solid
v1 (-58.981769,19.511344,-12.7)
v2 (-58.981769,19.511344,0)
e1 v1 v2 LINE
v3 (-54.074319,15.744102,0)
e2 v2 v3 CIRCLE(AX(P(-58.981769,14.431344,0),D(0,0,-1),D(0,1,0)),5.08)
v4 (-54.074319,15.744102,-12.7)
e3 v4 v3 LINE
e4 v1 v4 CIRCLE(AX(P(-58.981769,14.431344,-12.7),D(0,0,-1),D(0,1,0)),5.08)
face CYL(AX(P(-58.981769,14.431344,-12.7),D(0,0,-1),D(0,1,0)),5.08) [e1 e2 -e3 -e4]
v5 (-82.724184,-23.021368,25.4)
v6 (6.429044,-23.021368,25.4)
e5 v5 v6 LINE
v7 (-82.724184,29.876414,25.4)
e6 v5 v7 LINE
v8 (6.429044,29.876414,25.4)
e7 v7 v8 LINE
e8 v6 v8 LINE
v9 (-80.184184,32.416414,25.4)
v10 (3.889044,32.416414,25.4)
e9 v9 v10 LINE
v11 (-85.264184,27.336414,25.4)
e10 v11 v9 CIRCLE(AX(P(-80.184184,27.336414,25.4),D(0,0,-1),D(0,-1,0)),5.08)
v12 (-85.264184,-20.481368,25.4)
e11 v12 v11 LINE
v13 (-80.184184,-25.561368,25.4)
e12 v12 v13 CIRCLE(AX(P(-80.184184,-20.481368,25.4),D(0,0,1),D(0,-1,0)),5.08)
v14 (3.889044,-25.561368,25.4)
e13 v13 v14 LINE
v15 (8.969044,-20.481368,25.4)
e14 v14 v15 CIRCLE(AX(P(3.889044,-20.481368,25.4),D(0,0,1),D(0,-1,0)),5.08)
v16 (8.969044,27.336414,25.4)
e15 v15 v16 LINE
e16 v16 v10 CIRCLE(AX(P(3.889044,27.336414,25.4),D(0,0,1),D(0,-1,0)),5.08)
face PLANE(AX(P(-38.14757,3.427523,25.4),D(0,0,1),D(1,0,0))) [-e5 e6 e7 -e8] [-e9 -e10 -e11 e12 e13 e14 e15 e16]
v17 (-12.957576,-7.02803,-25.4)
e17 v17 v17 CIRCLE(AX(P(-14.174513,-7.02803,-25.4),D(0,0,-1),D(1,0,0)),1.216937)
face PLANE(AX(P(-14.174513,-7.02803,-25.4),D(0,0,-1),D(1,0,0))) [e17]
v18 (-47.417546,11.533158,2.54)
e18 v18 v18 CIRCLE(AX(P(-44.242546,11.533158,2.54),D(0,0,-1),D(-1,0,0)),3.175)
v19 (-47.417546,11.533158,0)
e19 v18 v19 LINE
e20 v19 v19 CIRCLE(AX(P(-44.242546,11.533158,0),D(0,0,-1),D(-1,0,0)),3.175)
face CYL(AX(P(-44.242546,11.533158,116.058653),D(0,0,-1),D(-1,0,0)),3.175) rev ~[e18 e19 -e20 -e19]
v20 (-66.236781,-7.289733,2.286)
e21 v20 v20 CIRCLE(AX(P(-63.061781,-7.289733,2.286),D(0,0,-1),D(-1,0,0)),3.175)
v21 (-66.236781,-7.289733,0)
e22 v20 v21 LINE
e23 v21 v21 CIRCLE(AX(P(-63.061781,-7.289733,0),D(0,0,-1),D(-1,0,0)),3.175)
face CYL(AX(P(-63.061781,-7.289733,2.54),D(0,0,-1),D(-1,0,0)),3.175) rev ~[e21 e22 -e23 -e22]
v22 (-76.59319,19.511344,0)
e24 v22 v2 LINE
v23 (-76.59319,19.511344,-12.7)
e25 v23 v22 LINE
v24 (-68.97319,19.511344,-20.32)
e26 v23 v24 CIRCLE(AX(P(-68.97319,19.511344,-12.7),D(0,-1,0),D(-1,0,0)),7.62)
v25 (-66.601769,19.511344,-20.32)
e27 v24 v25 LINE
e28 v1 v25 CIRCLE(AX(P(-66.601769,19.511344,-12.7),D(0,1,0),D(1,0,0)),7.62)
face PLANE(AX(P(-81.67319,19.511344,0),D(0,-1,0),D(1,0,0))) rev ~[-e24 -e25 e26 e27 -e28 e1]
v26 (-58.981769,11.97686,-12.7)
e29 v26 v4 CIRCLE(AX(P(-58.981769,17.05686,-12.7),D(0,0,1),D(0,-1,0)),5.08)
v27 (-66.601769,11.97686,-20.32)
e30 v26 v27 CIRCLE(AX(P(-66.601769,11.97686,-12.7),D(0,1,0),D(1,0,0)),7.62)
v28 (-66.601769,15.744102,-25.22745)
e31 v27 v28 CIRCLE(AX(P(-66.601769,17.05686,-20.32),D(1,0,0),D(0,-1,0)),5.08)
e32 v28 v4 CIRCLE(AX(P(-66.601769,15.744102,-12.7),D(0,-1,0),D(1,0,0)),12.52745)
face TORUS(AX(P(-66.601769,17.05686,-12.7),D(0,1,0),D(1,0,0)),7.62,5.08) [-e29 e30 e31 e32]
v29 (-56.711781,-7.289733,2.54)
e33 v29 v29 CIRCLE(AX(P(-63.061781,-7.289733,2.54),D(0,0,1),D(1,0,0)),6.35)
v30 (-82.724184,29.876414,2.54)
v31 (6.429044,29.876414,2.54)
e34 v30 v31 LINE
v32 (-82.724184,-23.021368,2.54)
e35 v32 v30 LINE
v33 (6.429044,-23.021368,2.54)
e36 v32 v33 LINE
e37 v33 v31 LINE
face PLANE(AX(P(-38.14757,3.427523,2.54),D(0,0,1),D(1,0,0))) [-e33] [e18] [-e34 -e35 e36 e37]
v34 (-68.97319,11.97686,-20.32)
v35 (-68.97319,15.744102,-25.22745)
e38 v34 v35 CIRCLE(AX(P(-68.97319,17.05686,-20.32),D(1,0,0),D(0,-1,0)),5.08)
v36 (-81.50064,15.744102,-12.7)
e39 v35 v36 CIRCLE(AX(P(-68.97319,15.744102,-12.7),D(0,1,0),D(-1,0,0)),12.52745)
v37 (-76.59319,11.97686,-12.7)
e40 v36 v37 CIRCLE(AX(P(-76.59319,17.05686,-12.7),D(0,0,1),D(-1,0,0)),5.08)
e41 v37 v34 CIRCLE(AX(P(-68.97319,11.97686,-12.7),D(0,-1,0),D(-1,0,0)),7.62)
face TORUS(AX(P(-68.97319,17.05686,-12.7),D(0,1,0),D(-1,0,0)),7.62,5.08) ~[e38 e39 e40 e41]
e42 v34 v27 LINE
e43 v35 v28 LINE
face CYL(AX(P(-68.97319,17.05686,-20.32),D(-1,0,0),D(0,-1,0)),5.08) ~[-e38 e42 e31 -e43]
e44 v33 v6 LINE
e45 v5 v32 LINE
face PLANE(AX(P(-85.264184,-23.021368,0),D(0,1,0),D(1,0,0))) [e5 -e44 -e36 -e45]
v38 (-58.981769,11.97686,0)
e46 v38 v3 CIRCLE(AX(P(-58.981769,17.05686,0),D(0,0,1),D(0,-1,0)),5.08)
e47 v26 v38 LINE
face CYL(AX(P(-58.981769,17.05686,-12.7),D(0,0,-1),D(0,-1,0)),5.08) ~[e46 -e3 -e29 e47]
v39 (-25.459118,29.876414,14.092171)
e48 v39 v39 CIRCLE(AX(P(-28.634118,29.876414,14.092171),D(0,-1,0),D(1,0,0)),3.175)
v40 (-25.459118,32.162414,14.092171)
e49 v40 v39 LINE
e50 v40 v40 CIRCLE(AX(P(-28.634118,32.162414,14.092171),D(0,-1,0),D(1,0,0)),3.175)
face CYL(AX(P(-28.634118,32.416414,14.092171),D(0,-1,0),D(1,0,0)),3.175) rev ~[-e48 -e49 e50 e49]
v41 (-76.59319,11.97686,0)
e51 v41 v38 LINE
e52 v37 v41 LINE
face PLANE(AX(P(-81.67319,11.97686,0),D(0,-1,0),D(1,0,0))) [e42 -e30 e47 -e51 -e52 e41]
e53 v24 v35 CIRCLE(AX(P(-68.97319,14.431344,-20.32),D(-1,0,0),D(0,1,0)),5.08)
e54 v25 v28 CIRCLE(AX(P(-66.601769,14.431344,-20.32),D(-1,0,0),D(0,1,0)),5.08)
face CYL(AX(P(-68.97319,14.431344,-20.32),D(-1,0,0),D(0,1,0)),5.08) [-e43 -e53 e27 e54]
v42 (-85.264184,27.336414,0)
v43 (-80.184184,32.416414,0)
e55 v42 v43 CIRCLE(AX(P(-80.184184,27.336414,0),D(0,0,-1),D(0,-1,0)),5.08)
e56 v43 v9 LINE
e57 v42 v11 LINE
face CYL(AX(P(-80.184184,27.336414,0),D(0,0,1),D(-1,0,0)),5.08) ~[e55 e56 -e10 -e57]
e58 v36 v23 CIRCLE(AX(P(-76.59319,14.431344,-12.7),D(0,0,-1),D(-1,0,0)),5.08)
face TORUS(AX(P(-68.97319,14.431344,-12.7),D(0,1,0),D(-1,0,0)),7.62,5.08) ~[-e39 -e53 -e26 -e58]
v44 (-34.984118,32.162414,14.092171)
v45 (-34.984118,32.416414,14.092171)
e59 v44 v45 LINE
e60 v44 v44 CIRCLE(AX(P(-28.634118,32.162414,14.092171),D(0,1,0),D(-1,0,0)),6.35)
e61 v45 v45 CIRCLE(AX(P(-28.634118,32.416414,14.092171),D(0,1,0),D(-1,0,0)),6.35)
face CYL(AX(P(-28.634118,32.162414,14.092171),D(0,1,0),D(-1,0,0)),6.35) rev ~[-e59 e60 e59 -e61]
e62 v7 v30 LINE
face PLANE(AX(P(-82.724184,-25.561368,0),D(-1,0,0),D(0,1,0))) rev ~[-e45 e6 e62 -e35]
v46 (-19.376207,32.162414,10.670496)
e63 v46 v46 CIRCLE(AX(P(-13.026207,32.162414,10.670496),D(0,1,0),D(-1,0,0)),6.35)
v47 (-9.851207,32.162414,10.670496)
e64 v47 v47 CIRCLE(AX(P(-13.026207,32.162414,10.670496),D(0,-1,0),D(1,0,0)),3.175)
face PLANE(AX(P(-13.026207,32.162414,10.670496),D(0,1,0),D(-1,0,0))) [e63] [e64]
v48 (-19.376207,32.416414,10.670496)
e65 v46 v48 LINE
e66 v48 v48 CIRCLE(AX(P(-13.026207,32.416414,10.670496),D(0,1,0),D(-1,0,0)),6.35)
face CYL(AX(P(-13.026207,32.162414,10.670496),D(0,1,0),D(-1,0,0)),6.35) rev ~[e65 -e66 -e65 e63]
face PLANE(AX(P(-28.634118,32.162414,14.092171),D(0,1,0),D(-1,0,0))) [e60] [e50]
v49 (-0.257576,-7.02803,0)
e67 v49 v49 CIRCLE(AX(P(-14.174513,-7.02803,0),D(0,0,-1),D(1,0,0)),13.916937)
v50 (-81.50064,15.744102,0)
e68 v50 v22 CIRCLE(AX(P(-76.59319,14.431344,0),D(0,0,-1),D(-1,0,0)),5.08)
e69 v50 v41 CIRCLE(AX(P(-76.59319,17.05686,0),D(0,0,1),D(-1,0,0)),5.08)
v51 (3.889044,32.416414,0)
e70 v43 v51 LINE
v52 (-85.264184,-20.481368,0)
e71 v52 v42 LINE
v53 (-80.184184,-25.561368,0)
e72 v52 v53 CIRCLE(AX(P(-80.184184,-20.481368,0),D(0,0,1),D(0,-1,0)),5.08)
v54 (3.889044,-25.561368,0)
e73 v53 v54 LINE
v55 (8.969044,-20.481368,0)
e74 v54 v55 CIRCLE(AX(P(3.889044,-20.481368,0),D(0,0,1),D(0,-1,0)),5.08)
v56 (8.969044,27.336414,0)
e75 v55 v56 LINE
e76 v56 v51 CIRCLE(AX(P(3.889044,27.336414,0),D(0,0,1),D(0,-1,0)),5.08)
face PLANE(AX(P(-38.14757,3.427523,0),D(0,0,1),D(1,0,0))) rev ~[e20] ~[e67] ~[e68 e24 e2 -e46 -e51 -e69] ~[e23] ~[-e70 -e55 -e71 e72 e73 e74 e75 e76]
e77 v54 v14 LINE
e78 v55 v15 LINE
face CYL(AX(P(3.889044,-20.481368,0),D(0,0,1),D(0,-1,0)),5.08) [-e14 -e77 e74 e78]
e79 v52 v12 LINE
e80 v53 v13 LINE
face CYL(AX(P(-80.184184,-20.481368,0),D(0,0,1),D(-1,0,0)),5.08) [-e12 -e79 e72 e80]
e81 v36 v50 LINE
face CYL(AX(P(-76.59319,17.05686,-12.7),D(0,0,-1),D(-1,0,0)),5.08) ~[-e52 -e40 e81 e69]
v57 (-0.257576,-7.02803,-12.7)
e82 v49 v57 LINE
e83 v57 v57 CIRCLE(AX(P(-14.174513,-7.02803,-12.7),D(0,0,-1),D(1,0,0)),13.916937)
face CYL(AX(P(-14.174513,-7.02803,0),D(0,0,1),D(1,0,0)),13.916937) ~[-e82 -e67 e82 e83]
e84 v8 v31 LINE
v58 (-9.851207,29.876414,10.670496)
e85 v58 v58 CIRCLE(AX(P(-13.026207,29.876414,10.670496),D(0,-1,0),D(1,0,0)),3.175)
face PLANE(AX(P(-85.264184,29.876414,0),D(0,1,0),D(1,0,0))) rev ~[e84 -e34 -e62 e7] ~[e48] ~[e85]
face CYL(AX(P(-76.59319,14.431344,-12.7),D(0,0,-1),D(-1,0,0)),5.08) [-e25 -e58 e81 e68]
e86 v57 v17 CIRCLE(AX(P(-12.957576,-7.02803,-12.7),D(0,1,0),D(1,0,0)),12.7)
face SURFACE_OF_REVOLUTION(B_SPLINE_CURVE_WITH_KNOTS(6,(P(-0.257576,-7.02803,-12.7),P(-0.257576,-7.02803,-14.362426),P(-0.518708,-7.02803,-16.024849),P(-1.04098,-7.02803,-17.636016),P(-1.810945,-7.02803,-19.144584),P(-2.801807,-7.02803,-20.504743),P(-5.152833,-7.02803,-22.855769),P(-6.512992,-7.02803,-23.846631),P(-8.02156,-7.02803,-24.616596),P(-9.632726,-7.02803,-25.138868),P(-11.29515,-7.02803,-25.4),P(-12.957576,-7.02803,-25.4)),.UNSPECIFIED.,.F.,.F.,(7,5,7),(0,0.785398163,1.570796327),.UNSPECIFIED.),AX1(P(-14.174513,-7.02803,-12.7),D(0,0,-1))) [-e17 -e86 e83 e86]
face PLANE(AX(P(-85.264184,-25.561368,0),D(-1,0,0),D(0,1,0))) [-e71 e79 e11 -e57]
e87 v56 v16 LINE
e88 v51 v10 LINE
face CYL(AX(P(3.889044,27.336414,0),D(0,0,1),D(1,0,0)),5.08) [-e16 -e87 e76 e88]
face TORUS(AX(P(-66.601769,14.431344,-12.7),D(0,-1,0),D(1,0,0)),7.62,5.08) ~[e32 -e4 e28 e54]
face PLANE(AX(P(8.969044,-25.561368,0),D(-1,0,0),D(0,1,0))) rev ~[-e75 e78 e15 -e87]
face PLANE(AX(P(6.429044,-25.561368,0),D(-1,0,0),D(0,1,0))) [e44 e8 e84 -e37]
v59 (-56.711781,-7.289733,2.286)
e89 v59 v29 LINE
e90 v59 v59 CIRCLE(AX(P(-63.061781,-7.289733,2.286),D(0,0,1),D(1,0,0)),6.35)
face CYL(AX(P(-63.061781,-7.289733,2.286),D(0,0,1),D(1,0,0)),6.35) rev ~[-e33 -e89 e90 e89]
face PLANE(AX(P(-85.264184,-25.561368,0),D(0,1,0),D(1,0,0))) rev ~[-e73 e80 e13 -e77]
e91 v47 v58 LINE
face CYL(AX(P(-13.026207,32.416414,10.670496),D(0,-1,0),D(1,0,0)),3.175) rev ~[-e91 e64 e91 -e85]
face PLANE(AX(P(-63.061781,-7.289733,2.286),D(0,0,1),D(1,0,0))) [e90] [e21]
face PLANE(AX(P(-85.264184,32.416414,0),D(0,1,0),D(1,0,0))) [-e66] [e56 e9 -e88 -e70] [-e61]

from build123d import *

# Parameters (mm, degrees)
F0_W           = 94.2332278937
F0_H           = 57.9777825624
F1_DEPTH       = 25.4
F2_T           = -2.54
F3_R           = 5.08
F5_D           = 6.35
F7_D           = 6.35
F7_DEPTH       = 12.7
F7_CBORE_D     = 12.7
F7_CBORE_DEPTH = 0.254
F7_TIP         = 1.9077324654
F9_D           = 6.35
F9_DEPTH       = 12.7
F9_CBORE_D     = 12.7
F9_CBORE_DEPTH = 0.254
F9_TIP         = 1.9077324654
F10_R          = 13.9169366501
F11_DEPTH      = 25.4
F12_R          = 12.7
F13_W          = 27.7714207768
F13_H          = 7.534484379
F14_DEPTH      = 25.4
F15_R          = 12.7
F16_T1_DEPTH   = 12.7
F16_T3_DEPTH   = 2.3714207768
F16_T6_ANGLE   = 90
F16_T8_ANGLE   = 90
F16_T10_ANGLE  = 90
F16_T12_ANGLE  = 90


# Not quite as in the source:
# - a fillet or chamfer that OpenCascade refuses, or shapes differently, is made with other operations: its cross-section is extruded or revolved along the edge and cut away or added


with BuildPart() as f1:
    # F0 (on Top) → F1 (new body)
    with BuildSketch(Plane.XY):
        with Locations((-38.147569634, 3.4275231883)):
            Rectangle(F0_W, F0_H)
    extrude(amount=F1_DEPTH)

    # F2
    f2_openings = [f1.faces().sort_by_distance(p)[0] for p in [
        (-38.14757, 3.427523, 25.4),
    ]]
    offset(amount=F2_T, openings=f2_openings)

    # F3
    f3_edges = [f1.edges().sort_by_distance(p)[0] for p in [
        (-85.264184, -25.561368, 12.7),
        (8.969044, -25.561368, 12.7),
        (8.969044, 32.416414, 12.7),
        (-85.264184, 32.416414, 12.7),
    ]]
    fillet(f3_edges, radius=F3_R)

    # F5 (through all)
    with Locations(Plane.XY.offset(2.54)):
        with Locations((-44.2425459623, 11.5331579)):
            Hole(F5_D / 2)

    # F7
    with Locations(Plane.XY.offset(2.54)):
        with Locations((-63.0617812276, -7.2897328064)):
            CounterBoreHole(F7_D / 2, F7_CBORE_D / 2, F7_CBORE_DEPTH, depth=F7_DEPTH)
            with Locations((0, 0, -(F7_DEPTH + F7_TIP / 2))):  # 118° drill point
                Cone(0, F7_D / 2, F7_TIP, mode=Mode.SUBTRACT)

    # F9
    with Locations(Plane(origin=(0, 32.4164144695, 0), x_dir=(-1, 0, 0), z_dir=(0, 1, 0))):
        with Locations((13.0262067541, 10.6704961509), (28.6341179162, 14.0921706334)):
            CounterBoreHole(F9_D / 2, F9_CBORE_D / 2, F9_CBORE_DEPTH, depth=F9_DEPTH)
            with Locations((0, 0, -(F9_DEPTH + F9_TIP / 2))):  # 118° drill point
                Cone(0, F9_D / 2, F9_TIP, mode=Mode.SUBTRACT)

    # F10 (on face) → F11 (join)
    with BuildSketch(Plane(origin=(0, 0, 0), x_dir=(1, 0, 0), z_dir=(0, 0, -1))):
        with Locations((-14.1745125875, 7.0280302316)):
            Circle(F10_R)
    extrude(amount=F11_DEPTH)

    # F12
    f12_edges = [f1.edges().sort_by_distance(p)[0] for p in [
        (-28.091449, -7.02803, -25.4),
    ]]
    fillet(f12_edges, radius=F12_R)

    # F13 (on face) → F14 (join)
    with BuildSketch(Plane(origin=(0, 0, 0), x_dir=(1, 0, 0), z_dir=(0, 0, -1))):
        with Locations((-67.7874796093, -15.7441017218)):
            Rectangle(F13_W, F13_H)
    extrude(amount=F14_DEPTH)

    # F15
    f15_edges = [f1.edges().sort_by_distance(p)[0] for p in [
        (-53.901769, 15.744102, -25.4),
        (-81.67319, 15.744102, -25.4),
    ]]
    fillet(f15_edges, radius=F15_R)

    # F16: fillet of radius 5.08 on 2 edges, made by hand

    # F16_s2 → F16_t1 (cut)
    with BuildSketch(Plane.XY.offset(-12.7)):
        with BuildLine():
            ThreePointArc((-58.9817692208, 19.5113439113), (-55.3896667724, 18.0234463597), (-53.9017692208, 14.4313439113))
            Line((-53.9017692208, 14.4313439113), (-53.9017692208, 19.5113439113))
            Line((-53.9017692208, 19.5113439113), (-58.9817692208, 19.5113439113))
        make_face()
        with BuildLine():
            ThreePointArc((-81.6731899977, 14.4313439113), (-80.1852924461, 18.0234463597), (-76.5931899977, 19.5113439113))
            Line((-76.5931899977, 19.5113439113), (-81.6731899977, 19.5113439113))
            Line((-81.6731899977, 19.5113439113), (-81.6731899977, 14.4313439113))
        make_face()
        with BuildLine():
            ThreePointArc((-81.6731899977, 17.0568595323), (-80.1852924461, 13.4647570839), (-76.5931899977, 11.9768595323))
            Line((-76.5931899977, 11.9768595323), (-81.6731899977, 11.9768595323))
            Line((-81.6731899977, 11.9768595323), (-81.6731899977, 17.0568595323))
        make_face()
        with BuildLine():
            ThreePointArc((-58.9817692208, 11.9768595323), (-55.3896667724, 13.4647570839), (-53.9017692208, 17.0568595323))
            Line((-53.9017692208, 17.0568595323), (-53.9017692208, 11.9768595323))
            Line((-53.9017692208, 11.9768595323), (-58.9817692208, 11.9768595323))
        make_face()
    extrude(amount=F16_T1_DEPTH, mode=Mode.SUBTRACT)

    # F16_s4 → F16_t3 (cut)
    with BuildSketch(Plane.YZ.offset(-68.9731899977)):
        with BuildLine():
            ThreePointArc((19.5113439113, -20.32), (18.0234463597, -23.9121024484), (14.4313439113, -25.4))
            Line((14.4313439113, -25.4), (19.5113439113, -25.4))
            Line((19.5113439113, -25.4), (19.5113439113, -20.32))
        make_face()
        with BuildLine():
            ThreePointArc((11.9768595323, -20.32), (13.4647570839, -23.9121024484), (17.0568595323, -25.4))
            Line((17.0568595323, -25.4), (11.9768595323, -25.4))
            Line((11.9768595323, -25.4), (11.9768595323, -20.32))
        make_face()
    extrude(amount=F16_T3_DEPTH, mode=Mode.SUBTRACT)

    # F16_s5 → F16_t6 (revolve, cut)
    with BuildSketch(Plane.XY.offset(-12.7)):
        with BuildLine():
            ThreePointArc((-76.5931899977, 11.9768595323), (-80.1852924461, 13.4647570839), (-81.6731899977, 17.0568595323))
            Line((-81.6731899977, 17.0568595323), (-81.6731899977, 11.9768595323))
            Line((-81.6731899977, 11.9768595323), (-76.5931899977, 11.9768595323))
        make_face()
    revolve(axis=Axis((-68.9731899977, 11.9768595323, -12.7), (0, -1, 0)), revolution_arc=F16_T6_ANGLE, mode=Mode.SUBTRACT)

    # F16_s7 → F16_t8 (revolve, cut)
    with BuildSketch(Plane.XY.offset(-12.7)):
        with BuildLine():
            ThreePointArc((-58.9817692208, 19.5113439113), (-55.3896667724, 18.0234463597), (-53.9017692208, 14.4313439113))
            Line((-53.9017692208, 14.4313439113), (-53.9017692208, 19.5113439113))
            Line((-53.9017692208, 19.5113439113), (-58.9817692208, 19.5113439113))
        make_face()
    revolve(axis=Axis((-66.6017692208, 19.5113439113, -12.7), (0, 1, 0)), revolution_arc=F16_T8_ANGLE, mode=Mode.SUBTRACT)

    # F16_s9 → F16_t10 (revolve, cut)
    with BuildSketch(Plane.XY.offset(-12.7)):
        with BuildLine():
            ThreePointArc((-81.6731899977, 14.4313439113), (-80.1852924461, 18.0234463597), (-76.5931899977, 19.5113439113))
            Line((-76.5931899977, 19.5113439113), (-81.6731899977, 19.5113439113))
            Line((-81.6731899977, 19.5113439113), (-81.6731899977, 14.4313439113))
        make_face()
    revolve(axis=Axis((-68.9731899977, 19.5113439113, -12.7), (0, -1, 0)), revolution_arc=F16_T10_ANGLE, mode=Mode.SUBTRACT)

    # F16_s11 → F16_t12 (revolve, cut)
    with BuildSketch(Plane.XY.offset(-12.7)):
        with BuildLine():
            ThreePointArc((-58.9817692208, 11.9768595323), (-55.3896667724, 13.4647570839), (-53.9017692208, 17.0568595323))
            Line((-53.9017692208, 17.0568595323), (-53.9017692208, 11.9768595323))
            Line((-53.9017692208, 11.9768595323), (-58.9817692208, 11.9768595323))
        make_face()
    revolve(axis=Axis((-66.6017692208, 11.9768595323, -12.7), (0, 1, 0)), revolution_arc=F16_T12_ANGLE, mode=Mode.SUBTRACT)


solid = f1.part
